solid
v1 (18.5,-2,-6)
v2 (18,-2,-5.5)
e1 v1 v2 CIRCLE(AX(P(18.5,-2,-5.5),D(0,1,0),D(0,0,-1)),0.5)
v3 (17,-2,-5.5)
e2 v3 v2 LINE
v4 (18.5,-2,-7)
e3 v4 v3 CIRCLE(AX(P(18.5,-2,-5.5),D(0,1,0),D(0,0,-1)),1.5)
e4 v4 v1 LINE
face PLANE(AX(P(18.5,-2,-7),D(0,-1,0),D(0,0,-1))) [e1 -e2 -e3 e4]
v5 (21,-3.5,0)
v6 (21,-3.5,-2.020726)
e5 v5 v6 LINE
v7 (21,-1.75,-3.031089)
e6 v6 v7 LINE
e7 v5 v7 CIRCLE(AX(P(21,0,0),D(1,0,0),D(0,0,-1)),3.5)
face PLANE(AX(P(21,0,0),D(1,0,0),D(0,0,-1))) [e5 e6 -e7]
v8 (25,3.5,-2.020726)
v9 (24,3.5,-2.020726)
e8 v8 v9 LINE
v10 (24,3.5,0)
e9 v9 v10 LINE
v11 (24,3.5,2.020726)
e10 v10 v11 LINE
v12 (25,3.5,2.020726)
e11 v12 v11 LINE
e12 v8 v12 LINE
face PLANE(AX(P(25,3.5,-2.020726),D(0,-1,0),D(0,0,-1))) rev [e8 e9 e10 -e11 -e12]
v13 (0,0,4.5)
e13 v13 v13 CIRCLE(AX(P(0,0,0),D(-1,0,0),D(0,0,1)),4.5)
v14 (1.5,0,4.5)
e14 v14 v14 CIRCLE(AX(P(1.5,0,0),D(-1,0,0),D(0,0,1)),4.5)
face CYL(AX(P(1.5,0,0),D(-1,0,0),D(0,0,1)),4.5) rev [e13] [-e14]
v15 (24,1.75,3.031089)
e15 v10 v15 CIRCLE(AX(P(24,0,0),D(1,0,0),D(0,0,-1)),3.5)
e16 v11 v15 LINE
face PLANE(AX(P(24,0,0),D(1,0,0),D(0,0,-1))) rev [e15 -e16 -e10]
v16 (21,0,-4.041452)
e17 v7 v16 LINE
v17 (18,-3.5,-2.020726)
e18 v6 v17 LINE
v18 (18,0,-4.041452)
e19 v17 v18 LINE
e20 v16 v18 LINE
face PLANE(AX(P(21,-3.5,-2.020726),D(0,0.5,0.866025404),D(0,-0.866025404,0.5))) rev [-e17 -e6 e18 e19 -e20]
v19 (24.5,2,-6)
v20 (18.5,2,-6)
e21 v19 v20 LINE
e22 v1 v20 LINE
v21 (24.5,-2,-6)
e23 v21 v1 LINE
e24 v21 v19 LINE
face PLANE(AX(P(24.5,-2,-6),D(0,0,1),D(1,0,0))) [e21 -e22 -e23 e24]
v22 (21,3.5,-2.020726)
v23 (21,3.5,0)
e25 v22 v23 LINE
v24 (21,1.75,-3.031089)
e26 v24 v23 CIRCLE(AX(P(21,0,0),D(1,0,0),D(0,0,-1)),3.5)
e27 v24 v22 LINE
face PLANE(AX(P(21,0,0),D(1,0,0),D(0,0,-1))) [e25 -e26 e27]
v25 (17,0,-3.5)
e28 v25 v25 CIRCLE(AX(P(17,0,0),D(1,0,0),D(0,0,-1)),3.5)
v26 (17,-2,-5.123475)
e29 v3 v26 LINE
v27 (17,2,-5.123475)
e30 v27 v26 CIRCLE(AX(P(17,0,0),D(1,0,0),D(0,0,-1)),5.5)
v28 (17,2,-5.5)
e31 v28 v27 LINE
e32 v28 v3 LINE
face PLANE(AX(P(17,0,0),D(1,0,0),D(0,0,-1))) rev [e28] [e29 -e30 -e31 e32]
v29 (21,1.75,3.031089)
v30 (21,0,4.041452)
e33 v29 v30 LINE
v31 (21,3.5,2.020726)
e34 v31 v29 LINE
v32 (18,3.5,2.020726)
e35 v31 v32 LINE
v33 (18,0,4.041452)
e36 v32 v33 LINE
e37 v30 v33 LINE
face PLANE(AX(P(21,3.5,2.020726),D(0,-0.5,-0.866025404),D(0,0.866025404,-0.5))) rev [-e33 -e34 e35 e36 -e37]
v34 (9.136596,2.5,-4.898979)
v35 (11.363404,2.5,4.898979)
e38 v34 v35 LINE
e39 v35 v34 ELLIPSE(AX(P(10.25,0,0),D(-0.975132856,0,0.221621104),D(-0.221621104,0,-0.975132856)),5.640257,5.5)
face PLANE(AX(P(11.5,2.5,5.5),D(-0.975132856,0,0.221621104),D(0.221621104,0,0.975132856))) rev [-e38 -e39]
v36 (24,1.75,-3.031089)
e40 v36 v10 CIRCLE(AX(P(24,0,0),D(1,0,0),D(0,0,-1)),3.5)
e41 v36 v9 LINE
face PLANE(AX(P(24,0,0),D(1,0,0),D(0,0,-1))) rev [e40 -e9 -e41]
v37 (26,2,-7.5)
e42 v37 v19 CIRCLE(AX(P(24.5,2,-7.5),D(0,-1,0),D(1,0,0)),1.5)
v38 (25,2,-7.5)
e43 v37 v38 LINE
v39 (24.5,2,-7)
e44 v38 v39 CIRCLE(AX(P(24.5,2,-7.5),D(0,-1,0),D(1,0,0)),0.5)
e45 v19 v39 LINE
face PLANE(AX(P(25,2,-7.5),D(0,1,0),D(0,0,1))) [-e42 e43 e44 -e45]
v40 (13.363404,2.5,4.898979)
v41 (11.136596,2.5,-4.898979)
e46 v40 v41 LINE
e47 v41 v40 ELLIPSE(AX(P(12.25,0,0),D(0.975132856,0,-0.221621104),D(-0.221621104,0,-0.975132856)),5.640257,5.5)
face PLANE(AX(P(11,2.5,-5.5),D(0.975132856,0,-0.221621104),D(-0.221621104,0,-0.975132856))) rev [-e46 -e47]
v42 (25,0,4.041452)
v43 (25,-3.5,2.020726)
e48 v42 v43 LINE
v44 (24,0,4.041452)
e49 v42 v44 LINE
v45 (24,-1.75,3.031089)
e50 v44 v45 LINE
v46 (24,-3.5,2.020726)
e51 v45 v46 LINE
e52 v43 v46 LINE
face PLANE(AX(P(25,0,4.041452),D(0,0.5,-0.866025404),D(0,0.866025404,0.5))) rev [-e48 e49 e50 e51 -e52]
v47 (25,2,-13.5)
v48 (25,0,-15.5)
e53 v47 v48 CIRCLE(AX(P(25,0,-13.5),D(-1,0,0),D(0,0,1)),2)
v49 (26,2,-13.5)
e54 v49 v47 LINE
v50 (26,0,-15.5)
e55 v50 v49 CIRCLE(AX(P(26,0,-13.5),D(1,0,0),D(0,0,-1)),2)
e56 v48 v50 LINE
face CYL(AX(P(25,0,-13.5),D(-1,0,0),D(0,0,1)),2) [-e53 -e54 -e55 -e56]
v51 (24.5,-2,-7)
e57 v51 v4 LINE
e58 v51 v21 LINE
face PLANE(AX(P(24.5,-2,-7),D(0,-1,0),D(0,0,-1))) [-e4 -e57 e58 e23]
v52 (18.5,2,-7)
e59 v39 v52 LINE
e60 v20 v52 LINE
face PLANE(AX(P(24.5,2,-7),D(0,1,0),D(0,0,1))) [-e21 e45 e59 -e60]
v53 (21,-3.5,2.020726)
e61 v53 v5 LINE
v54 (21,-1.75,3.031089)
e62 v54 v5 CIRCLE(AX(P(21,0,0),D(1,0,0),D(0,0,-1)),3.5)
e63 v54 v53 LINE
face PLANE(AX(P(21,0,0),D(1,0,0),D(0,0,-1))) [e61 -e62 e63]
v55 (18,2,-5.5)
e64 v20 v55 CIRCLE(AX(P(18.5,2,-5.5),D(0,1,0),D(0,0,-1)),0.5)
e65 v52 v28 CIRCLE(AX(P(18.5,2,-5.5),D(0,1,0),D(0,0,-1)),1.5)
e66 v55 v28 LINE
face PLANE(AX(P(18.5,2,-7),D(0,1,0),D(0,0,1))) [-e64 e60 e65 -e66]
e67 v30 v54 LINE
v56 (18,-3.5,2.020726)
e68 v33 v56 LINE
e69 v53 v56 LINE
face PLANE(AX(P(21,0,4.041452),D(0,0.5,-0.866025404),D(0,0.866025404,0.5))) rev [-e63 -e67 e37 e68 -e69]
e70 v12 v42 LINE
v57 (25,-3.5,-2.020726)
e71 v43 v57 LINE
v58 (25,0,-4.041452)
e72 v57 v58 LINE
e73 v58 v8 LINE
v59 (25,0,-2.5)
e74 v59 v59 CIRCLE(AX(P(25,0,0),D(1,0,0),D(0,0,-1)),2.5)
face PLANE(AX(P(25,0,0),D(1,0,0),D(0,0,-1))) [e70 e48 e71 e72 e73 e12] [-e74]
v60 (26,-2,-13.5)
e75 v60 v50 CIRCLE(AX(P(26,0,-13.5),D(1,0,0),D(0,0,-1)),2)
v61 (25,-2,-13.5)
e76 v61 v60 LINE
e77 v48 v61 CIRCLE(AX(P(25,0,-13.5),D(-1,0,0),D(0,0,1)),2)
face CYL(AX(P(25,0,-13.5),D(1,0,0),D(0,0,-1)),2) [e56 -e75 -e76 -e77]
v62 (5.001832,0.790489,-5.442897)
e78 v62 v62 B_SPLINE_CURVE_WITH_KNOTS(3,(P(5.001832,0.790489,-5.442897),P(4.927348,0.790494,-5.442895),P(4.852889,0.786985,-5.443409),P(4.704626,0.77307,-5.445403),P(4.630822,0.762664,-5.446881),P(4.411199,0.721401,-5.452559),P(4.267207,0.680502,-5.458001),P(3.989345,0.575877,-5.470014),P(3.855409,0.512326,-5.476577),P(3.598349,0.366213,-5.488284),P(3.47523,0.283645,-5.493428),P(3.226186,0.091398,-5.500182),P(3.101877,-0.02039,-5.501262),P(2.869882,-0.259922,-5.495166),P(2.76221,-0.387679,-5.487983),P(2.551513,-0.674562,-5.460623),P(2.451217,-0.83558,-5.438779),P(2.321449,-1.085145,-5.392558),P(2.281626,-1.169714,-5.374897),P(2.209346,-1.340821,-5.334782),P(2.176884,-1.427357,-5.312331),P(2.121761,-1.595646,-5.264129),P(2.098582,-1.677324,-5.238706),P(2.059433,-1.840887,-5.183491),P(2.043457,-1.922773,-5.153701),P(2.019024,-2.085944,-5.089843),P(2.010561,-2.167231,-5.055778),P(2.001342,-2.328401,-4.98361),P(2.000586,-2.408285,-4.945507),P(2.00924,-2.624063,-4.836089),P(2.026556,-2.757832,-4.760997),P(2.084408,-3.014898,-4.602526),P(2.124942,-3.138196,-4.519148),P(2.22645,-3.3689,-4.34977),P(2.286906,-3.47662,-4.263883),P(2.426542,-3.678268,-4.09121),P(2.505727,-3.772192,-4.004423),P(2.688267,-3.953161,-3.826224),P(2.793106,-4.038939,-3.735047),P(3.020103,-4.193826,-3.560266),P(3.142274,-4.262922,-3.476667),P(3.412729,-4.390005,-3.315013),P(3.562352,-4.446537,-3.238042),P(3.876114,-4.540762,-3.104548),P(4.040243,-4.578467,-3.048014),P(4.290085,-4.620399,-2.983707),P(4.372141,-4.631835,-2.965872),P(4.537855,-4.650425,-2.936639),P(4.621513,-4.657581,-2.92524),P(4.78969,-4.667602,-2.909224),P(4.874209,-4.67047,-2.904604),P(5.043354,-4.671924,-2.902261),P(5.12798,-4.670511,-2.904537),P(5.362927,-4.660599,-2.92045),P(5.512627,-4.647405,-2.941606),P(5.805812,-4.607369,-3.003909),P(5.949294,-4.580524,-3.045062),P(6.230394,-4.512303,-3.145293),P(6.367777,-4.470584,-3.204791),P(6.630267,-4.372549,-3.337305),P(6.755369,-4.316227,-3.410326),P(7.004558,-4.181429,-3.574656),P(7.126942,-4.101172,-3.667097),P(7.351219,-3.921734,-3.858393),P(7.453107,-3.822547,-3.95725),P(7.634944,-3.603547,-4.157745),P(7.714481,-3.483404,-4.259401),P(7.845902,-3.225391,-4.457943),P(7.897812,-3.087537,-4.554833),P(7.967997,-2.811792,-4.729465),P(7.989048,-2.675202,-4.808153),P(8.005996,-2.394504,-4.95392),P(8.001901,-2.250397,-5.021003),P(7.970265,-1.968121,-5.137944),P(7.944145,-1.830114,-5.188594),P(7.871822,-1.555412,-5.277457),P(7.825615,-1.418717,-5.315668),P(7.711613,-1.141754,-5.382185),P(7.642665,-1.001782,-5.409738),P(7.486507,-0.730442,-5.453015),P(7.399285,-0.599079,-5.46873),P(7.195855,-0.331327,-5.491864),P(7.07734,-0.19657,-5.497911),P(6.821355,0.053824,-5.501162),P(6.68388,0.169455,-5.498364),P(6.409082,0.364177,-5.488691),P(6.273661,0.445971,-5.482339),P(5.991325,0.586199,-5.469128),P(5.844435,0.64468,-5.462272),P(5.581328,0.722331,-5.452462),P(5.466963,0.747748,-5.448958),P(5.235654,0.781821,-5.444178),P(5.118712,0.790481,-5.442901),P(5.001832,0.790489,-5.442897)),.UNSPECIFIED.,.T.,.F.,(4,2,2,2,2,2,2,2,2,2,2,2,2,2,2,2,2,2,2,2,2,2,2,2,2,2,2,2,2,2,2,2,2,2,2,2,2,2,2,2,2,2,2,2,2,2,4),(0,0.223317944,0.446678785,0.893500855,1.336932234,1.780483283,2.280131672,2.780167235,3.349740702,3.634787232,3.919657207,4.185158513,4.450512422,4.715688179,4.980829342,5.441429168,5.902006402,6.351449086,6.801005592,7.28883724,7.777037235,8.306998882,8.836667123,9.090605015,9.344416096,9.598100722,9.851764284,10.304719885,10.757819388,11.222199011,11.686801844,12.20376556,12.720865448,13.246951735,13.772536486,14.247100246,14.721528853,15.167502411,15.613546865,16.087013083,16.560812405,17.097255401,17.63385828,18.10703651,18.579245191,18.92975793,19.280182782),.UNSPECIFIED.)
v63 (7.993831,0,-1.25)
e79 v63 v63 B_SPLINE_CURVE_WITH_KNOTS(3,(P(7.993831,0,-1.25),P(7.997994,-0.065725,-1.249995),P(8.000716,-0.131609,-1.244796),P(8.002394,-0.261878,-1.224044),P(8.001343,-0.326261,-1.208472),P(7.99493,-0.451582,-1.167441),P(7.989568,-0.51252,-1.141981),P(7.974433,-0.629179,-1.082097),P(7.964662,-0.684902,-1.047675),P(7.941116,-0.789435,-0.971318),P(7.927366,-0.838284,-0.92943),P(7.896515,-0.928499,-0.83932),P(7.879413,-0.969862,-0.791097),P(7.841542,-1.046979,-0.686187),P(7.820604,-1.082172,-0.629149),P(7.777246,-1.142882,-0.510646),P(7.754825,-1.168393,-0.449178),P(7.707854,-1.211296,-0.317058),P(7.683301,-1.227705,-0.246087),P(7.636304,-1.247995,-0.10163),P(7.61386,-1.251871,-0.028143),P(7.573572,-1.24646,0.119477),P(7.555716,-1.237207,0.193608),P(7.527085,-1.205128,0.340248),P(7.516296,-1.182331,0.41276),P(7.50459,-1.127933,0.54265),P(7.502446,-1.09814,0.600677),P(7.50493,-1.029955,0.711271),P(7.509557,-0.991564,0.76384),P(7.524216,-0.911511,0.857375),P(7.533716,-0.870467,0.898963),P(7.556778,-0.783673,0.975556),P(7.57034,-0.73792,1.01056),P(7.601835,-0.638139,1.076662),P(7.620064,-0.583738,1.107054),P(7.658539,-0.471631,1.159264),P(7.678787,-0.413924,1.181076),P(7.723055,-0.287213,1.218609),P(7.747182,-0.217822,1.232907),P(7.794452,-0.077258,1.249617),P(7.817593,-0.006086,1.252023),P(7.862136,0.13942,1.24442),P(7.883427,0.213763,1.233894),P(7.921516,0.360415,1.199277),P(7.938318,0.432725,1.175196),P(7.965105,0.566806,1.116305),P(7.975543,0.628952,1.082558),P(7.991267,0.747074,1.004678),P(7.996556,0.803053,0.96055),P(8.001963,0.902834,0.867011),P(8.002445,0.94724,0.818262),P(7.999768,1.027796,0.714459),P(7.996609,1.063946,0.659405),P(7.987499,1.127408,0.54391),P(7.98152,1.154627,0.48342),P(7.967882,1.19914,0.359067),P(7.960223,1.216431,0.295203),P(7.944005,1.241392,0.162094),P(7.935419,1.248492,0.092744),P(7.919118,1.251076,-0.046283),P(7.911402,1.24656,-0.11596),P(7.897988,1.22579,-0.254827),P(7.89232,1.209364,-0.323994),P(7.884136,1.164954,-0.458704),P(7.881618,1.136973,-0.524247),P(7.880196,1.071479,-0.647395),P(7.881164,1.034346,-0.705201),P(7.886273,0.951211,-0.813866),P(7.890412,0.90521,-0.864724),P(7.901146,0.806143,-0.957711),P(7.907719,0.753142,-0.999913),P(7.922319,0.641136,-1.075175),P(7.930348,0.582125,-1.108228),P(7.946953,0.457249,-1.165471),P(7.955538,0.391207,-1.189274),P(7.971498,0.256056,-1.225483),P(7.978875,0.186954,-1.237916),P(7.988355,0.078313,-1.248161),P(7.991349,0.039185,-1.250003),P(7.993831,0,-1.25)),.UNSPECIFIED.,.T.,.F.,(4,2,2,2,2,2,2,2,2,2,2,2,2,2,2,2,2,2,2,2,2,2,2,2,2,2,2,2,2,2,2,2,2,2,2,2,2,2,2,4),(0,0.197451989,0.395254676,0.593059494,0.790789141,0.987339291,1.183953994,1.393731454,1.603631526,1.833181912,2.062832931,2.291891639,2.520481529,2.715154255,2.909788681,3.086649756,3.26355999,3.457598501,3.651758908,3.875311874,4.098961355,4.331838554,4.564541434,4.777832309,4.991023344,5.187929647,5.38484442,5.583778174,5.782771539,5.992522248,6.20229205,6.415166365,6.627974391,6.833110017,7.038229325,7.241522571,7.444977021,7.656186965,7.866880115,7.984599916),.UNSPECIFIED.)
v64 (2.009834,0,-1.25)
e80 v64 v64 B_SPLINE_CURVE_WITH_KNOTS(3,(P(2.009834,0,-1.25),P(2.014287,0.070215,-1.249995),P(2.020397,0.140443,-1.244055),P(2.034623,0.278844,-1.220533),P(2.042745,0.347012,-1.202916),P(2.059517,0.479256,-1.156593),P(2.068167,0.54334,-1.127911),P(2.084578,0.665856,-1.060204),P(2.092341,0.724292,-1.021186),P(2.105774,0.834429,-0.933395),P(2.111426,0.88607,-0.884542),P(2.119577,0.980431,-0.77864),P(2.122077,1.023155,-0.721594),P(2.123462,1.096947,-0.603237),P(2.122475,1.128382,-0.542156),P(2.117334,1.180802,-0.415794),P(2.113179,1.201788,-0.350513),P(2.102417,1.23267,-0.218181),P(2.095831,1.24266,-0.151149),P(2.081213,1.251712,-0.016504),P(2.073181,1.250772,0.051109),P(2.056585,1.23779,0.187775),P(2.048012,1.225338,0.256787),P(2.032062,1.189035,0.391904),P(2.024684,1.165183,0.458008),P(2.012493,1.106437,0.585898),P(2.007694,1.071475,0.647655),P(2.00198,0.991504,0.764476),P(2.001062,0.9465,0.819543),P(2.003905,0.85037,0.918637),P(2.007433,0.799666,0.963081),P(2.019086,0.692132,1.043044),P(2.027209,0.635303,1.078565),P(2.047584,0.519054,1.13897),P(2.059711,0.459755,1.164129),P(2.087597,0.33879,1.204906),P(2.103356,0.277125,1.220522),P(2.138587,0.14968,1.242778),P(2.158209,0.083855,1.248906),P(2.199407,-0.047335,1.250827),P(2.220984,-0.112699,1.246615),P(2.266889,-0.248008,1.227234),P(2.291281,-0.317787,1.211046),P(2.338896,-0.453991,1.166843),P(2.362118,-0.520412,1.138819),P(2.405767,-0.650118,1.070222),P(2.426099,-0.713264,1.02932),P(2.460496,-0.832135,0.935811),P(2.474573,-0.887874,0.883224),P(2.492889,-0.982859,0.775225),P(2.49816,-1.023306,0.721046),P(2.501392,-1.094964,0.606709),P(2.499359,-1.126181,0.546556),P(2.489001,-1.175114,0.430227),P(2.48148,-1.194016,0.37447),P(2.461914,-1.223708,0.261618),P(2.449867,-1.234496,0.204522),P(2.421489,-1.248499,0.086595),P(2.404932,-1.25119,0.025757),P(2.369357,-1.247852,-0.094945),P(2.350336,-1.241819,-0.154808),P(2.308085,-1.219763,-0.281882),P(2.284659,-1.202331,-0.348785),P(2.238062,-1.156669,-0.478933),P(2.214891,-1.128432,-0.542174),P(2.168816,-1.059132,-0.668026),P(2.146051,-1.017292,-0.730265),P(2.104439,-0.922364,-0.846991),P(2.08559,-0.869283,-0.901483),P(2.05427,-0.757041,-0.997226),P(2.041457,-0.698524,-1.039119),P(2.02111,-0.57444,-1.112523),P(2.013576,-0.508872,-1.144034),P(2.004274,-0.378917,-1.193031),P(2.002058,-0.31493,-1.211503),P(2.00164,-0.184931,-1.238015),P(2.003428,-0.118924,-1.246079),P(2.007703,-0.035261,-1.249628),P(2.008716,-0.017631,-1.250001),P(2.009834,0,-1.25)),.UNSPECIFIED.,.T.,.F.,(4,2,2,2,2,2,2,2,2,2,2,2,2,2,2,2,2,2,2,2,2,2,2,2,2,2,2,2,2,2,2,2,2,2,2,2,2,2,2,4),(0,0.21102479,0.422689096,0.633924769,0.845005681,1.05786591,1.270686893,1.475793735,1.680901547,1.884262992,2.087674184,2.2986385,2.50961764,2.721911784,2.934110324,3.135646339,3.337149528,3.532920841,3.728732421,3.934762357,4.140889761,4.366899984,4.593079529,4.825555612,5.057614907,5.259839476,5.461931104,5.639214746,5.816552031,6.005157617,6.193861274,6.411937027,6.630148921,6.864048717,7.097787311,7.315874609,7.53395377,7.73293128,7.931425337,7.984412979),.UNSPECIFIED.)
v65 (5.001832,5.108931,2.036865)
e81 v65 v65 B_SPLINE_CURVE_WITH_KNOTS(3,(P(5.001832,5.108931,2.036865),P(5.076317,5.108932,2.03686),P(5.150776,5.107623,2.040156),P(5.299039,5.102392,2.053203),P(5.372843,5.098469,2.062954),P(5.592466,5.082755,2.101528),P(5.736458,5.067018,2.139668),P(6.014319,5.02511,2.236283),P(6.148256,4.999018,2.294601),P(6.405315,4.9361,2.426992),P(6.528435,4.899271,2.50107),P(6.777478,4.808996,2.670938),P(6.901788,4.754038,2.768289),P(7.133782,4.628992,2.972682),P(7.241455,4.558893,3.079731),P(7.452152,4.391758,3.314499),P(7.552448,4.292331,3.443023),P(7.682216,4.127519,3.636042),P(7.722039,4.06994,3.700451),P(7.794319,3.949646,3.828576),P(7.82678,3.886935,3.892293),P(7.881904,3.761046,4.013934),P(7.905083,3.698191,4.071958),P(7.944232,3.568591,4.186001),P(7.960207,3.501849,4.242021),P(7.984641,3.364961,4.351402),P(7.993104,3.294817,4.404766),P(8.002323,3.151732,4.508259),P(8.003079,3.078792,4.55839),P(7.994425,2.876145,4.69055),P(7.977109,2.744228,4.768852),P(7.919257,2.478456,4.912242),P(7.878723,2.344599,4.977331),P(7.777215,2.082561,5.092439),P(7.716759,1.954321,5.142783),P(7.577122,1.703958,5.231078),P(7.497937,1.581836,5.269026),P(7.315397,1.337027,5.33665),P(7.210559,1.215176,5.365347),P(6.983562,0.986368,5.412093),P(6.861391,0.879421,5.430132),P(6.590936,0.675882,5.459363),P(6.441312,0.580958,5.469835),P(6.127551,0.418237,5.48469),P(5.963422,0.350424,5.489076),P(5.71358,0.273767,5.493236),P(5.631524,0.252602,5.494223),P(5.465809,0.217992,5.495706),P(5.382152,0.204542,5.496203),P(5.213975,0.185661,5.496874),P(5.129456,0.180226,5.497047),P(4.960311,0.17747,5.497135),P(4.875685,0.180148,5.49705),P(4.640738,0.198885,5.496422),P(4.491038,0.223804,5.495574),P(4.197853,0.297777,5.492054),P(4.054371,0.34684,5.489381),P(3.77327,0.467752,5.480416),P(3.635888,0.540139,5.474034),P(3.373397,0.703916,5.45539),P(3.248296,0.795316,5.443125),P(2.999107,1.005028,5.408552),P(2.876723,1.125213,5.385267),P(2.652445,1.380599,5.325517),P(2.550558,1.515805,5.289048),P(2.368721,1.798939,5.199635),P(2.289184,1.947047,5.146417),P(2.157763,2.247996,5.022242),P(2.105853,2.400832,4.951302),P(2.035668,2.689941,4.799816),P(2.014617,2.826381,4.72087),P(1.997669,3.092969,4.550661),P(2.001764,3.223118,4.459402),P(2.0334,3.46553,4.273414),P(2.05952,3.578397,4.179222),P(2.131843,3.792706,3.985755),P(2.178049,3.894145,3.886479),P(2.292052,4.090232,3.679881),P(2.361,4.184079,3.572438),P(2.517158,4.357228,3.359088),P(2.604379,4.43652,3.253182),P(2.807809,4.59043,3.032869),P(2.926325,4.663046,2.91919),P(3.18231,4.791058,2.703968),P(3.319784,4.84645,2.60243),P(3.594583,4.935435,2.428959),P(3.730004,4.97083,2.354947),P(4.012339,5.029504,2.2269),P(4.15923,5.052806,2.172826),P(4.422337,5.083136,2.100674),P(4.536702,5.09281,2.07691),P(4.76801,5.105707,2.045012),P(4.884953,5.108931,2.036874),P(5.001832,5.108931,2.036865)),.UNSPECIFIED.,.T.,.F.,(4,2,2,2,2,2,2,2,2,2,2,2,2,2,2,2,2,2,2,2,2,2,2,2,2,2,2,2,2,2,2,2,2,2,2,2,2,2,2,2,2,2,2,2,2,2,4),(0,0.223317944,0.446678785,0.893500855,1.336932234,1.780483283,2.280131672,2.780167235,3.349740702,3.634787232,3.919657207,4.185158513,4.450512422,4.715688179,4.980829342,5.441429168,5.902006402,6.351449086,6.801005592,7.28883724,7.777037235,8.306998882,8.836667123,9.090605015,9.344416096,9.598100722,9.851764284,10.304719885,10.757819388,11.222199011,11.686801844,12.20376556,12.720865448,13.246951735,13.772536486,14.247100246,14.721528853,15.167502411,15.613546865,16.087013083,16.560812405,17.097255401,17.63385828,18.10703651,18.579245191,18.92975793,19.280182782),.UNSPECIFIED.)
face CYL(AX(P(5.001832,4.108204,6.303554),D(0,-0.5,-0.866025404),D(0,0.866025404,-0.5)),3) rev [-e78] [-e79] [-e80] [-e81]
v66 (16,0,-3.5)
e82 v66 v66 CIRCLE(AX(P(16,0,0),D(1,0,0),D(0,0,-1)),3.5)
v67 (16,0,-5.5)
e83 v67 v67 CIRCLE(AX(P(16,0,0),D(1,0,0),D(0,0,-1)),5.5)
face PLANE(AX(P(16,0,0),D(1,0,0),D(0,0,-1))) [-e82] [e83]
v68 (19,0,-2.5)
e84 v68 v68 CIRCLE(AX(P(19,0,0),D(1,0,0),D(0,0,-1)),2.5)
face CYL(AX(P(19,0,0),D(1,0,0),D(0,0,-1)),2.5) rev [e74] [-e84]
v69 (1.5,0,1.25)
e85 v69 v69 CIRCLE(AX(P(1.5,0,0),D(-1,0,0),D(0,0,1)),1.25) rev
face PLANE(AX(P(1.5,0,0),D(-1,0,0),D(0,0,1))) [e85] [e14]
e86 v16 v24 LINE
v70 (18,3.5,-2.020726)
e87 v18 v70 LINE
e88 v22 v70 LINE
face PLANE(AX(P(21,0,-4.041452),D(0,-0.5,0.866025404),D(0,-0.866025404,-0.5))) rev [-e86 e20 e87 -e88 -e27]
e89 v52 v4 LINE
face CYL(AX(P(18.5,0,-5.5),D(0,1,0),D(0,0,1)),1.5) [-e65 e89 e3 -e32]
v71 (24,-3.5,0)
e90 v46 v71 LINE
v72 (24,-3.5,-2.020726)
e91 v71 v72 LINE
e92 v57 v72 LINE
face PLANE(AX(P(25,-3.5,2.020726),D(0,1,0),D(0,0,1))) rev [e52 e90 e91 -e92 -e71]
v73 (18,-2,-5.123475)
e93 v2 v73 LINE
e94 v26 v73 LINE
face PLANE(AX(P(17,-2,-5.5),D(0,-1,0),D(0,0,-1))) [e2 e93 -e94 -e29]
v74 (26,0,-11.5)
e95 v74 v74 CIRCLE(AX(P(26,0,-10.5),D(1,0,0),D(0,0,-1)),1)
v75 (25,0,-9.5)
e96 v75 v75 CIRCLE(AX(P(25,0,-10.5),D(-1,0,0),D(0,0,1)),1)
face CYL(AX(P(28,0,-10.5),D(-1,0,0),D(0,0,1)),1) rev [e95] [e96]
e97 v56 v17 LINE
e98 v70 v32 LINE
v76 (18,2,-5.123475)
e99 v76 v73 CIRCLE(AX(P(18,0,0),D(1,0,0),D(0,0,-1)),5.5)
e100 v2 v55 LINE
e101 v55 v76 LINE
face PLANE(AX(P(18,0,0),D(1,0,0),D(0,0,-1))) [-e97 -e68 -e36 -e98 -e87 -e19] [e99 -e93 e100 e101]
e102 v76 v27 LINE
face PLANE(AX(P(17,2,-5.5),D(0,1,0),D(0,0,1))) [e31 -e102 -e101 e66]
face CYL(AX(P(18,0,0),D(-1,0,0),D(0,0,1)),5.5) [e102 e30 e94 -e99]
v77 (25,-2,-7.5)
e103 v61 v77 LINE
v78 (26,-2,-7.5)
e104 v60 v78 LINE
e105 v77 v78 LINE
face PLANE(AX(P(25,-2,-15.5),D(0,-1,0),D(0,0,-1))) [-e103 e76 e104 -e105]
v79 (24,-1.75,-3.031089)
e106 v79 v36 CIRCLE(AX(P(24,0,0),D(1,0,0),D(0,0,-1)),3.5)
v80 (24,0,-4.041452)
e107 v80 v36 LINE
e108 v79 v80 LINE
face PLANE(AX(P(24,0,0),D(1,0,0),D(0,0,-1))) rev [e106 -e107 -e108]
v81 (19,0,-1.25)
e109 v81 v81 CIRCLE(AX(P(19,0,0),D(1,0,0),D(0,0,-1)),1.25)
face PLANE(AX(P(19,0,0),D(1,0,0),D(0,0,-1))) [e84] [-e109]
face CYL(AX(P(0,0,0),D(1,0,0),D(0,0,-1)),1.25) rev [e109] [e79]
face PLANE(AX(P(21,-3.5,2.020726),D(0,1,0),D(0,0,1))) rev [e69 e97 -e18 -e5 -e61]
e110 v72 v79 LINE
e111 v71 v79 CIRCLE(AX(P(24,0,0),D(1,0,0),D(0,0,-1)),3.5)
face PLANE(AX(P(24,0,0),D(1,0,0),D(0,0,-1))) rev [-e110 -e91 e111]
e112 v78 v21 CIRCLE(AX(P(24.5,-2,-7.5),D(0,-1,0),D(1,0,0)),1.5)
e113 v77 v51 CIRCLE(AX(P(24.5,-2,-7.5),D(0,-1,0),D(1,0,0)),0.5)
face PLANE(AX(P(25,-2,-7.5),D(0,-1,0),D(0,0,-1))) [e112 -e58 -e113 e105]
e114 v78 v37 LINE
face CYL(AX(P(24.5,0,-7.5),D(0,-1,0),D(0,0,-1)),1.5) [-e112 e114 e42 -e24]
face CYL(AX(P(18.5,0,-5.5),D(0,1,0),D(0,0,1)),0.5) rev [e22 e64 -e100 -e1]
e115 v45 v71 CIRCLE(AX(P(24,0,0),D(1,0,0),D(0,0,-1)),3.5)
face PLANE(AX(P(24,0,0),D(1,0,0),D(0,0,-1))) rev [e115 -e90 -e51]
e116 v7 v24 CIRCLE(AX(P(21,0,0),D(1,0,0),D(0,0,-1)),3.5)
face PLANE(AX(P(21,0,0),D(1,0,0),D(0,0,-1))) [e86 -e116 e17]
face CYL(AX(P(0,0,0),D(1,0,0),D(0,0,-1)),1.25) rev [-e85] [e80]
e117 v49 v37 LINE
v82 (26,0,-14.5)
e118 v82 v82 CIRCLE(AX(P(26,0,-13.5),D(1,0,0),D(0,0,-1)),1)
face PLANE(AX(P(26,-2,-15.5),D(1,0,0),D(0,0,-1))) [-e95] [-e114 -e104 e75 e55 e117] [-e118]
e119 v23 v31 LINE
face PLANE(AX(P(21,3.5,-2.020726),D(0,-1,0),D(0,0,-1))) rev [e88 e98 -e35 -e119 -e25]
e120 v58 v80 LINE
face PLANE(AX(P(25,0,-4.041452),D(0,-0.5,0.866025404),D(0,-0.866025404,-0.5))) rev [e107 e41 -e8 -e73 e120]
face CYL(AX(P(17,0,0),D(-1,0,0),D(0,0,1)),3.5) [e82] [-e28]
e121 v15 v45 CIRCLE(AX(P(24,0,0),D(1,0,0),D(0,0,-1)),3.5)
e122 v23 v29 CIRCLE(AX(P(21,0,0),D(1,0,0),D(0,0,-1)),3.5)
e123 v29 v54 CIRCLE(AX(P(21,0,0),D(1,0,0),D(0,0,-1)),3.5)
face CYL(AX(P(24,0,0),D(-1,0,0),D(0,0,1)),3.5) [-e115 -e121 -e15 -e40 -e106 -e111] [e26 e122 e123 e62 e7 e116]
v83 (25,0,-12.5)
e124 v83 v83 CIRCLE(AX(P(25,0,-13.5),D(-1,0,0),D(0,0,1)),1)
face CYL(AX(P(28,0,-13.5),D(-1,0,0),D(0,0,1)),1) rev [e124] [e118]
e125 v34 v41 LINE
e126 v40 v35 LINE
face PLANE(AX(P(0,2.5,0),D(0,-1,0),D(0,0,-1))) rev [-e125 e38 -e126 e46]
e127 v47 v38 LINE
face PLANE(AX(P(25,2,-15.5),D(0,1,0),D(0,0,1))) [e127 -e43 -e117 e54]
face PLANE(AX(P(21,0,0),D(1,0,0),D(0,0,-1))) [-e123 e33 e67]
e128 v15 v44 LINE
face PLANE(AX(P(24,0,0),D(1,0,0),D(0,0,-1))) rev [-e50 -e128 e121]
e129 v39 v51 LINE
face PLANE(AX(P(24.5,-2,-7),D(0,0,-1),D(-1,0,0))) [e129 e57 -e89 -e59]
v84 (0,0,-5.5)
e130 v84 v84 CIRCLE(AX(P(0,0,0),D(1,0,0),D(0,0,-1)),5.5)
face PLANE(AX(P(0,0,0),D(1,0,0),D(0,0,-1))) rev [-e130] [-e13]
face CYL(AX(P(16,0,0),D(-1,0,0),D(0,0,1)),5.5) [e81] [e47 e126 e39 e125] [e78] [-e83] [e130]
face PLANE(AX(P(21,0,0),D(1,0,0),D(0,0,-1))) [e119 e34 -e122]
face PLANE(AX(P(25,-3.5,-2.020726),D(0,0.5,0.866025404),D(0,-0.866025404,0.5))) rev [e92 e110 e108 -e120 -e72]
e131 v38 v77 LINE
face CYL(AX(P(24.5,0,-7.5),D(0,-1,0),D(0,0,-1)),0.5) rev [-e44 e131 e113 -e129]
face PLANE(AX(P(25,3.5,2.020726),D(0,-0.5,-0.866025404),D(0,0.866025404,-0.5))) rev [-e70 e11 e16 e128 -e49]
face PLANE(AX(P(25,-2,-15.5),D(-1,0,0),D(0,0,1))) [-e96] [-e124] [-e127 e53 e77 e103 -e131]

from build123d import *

# Parameters (mm, degrees)
SKETCH1_R           = 5.5
BOSS_EXTRUDE1_DEPTH = 16
SKETCH2_R           = 3.5
BOSS_EXTRUDE2_DEPTH = 1
SKETCH3_R           = 5.5
BOSS_EXTRUDE3_DEPTH = 1
SKETCH5_W           = 1
SKETCH5_H           = 4
FILLET1_R           = 2
BOSS_EXTRUDE4_DEPTH = 3
SKETCH8_R           = 3.5
BOSS_EXTRUDE5_DEPTH = 3
BOSS_EXTRUDE7_DEPTH = 1
SKETCH17_R          = 2.5
CUT_EXTRUDE7_DEPTH  = 6
SKETCH18_R          = 1.25
CUT_EXTRUDE8_DEPTH  = 26.129663746
SKETCH19_R          = 4.5
CUT_EXTRUDE9_DEPTH  = 1.5
SKETCH21_R          = 3
CUT_EXTRUDE10_DEPTH = 30.314547048
CUT_EXTRUDE12_DEPTH = 3
SKETCH24_R          = 1
CUT_EXTRUDE13_DEPTH = 3


with BuildPart() as part:
    # Sketch1 → Boss-Extrude1 (new body)
    with BuildSketch(Plane(origin=(0, 0, 0), x_dir=(0, 0, -1), z_dir=(1, 0, 0))):
        Circle(SKETCH1_R)
    extrude(amount=BOSS_EXTRUDE1_DEPTH)

    # Sketch2 → Boss-Extrude2 (add)
    with BuildSketch(Plane(origin=(16, 0, 0), x_dir=(0, 0, -1), z_dir=(1, 0, 0))):
        Circle(SKETCH2_R)
    extrude(amount=BOSS_EXTRUDE2_DEPTH)

    # Sketch3 → Boss-Extrude3 (add)
    with BuildSketch(Plane(origin=(17, 0, 0), x_dir=(0, 0, -1), z_dir=(1, 0, 0))):
        Circle(SKETCH3_R)
    extrude(amount=BOSS_EXTRUDE3_DEPTH)

    # Sweep1: sweep along a path in Sketch4
    with BuildLine(Plane(origin=(0, 0, 0), x_dir=(1, 0, 0), z_dir=(0, 1, 0))) as sweep1_path:
        Line((25.5, 15.5), (25.5, 7.5))
        ThreePointArc((25.5, 7.5), (25.207106781, 6.792893219), (24.5, 6.5))
        Line((24.5, 6.5), (18.5, 6.5))
        ThreePointArc((18.5, 6.5), (17.792893219, 6.207106781), (17.5, 5.5))
        Line((17.5, 5.5), (17.5, 4.331461844))
    # Sketch5 → Sweep1 (sweep)
    with BuildSketch(Plane.XY.offset(-15.5)):
        with Locations((25.5, 0)):
            Rectangle(SKETCH5_W, SKETCH5_H)
    sweep(path=sweep1_path.line)

    # Fillet1
    fillet1_edges = [part.edges().sort_by_distance(p)[0] for p in [
        (25.5, -2, -15.5),
        (25.5, 2, -15.5),
    ]]
    fillet(fillet1_edges, radius=FILLET1_R - 0.0001)  # a hair under: the kernel refuses the full size

    # Sketch7 → Boss-Extrude4 (add)
    with BuildSketch(Plane(origin=(18, 0, 0), x_dir=(0, 0, -1), z_dir=(1, 0, 0))):
        Polygon((-2.020725942, -3.5), (2.020725942, -3.5), (4.041451884, 0), (2.020725942, 3.5), (-2.020725942, 3.5), (-4.041451884, 0), align=None)
    extrude(amount=BOSS_EXTRUDE4_DEPTH)

    # Sketch8 → Boss-Extrude5 (add)
    with BuildSketch(Plane(origin=(21, 0, 0), x_dir=(0, 0, -1), z_dir=(1, 0, 0))):
        Circle(SKETCH8_R)
    extrude(amount=BOSS_EXTRUDE5_DEPTH)

    # Sketch9 → Boss-Extrude7 (add)
    with BuildSketch(Plane(origin=(24, 0, 0), x_dir=(0, 0, -1), z_dir=(1, 0, 0))):
        Polygon((-2.020725942, -3.5), (2.020725942, -3.5), (4.041451884, 0), (2.020725942, 3.5), (-2.020725942, 3.5), (-4.041451884, 0), align=None)
    extrude(amount=BOSS_EXTRUDE7_DEPTH)

    # Sketch17 → Cut-Extrude7 (cut)
    with BuildSketch(Plane(origin=(25, 0, 0), x_dir=(0, 0, -1), z_dir=(1, 0, 0))):
        Circle(SKETCH17_R)
    extrude(amount=-CUT_EXTRUDE7_DEPTH, mode=Mode.SUBTRACT)

    # Sketch18 → Cut-Extrude8 (cut, through all)
    with BuildSketch(Plane(origin=(19, 0, 0), x_dir=(0, 0, -1), z_dir=(1, 0, 0))):
        Circle(SKETCH18_R)
    extrude(amount=-CUT_EXTRUDE8_DEPTH, mode=Mode.SUBTRACT)

    # Sketch19 → Cut-Extrude9 (cut)
    with BuildSketch(Plane.ZY):
        Circle(SKETCH19_R)
    extrude(amount=-CUT_EXTRUDE9_DEPTH, mode=Mode.SUBTRACT)

    # Sketch21 → Cut-Extrude10 (cut, through all)
    with BuildSketch(Plane(origin=(0, -2.75, -4.763139721), x_dir=(-1, 0, 0), z_dir=(0, -0.5000000000000002, -0.8660254037844385))):
        with Locations(Location((-5.001832393, 0.406031974, 0), (0, 0, 90))):
            Circle(SKETCH21_R)
    extrude(amount=-CUT_EXTRUDE10_DEPTH, mode=Mode.SUBTRACT)

    # Sketch23 → Cut-Extrude12 (cut)
    with BuildSketch(Plane(origin=(0, 5.5, 0), x_dir=(1, 0, 0), z_dir=(0, 1, 0))):
        Polygon((11, 5.5), (13.5, -5.5), (11.5, -5.5), (9, 5.5), align=None)
    extrude(amount=-CUT_EXTRUDE12_DEPTH, mode=Mode.SUBTRACT)

    # Sketch24 → Cut-Extrude13 (cut)
    with BuildSketch(Plane.ZY.offset(-25)):
        with Locations((-13.5, 0)):
            Circle(SKETCH24_R)
        with Locations((-10.5, 0)):
            Circle(SKETCH24_R)
    extrude(amount=-CUT_EXTRUDE13_DEPTH, mode=Mode.SUBTRACT)


solid = part.part
